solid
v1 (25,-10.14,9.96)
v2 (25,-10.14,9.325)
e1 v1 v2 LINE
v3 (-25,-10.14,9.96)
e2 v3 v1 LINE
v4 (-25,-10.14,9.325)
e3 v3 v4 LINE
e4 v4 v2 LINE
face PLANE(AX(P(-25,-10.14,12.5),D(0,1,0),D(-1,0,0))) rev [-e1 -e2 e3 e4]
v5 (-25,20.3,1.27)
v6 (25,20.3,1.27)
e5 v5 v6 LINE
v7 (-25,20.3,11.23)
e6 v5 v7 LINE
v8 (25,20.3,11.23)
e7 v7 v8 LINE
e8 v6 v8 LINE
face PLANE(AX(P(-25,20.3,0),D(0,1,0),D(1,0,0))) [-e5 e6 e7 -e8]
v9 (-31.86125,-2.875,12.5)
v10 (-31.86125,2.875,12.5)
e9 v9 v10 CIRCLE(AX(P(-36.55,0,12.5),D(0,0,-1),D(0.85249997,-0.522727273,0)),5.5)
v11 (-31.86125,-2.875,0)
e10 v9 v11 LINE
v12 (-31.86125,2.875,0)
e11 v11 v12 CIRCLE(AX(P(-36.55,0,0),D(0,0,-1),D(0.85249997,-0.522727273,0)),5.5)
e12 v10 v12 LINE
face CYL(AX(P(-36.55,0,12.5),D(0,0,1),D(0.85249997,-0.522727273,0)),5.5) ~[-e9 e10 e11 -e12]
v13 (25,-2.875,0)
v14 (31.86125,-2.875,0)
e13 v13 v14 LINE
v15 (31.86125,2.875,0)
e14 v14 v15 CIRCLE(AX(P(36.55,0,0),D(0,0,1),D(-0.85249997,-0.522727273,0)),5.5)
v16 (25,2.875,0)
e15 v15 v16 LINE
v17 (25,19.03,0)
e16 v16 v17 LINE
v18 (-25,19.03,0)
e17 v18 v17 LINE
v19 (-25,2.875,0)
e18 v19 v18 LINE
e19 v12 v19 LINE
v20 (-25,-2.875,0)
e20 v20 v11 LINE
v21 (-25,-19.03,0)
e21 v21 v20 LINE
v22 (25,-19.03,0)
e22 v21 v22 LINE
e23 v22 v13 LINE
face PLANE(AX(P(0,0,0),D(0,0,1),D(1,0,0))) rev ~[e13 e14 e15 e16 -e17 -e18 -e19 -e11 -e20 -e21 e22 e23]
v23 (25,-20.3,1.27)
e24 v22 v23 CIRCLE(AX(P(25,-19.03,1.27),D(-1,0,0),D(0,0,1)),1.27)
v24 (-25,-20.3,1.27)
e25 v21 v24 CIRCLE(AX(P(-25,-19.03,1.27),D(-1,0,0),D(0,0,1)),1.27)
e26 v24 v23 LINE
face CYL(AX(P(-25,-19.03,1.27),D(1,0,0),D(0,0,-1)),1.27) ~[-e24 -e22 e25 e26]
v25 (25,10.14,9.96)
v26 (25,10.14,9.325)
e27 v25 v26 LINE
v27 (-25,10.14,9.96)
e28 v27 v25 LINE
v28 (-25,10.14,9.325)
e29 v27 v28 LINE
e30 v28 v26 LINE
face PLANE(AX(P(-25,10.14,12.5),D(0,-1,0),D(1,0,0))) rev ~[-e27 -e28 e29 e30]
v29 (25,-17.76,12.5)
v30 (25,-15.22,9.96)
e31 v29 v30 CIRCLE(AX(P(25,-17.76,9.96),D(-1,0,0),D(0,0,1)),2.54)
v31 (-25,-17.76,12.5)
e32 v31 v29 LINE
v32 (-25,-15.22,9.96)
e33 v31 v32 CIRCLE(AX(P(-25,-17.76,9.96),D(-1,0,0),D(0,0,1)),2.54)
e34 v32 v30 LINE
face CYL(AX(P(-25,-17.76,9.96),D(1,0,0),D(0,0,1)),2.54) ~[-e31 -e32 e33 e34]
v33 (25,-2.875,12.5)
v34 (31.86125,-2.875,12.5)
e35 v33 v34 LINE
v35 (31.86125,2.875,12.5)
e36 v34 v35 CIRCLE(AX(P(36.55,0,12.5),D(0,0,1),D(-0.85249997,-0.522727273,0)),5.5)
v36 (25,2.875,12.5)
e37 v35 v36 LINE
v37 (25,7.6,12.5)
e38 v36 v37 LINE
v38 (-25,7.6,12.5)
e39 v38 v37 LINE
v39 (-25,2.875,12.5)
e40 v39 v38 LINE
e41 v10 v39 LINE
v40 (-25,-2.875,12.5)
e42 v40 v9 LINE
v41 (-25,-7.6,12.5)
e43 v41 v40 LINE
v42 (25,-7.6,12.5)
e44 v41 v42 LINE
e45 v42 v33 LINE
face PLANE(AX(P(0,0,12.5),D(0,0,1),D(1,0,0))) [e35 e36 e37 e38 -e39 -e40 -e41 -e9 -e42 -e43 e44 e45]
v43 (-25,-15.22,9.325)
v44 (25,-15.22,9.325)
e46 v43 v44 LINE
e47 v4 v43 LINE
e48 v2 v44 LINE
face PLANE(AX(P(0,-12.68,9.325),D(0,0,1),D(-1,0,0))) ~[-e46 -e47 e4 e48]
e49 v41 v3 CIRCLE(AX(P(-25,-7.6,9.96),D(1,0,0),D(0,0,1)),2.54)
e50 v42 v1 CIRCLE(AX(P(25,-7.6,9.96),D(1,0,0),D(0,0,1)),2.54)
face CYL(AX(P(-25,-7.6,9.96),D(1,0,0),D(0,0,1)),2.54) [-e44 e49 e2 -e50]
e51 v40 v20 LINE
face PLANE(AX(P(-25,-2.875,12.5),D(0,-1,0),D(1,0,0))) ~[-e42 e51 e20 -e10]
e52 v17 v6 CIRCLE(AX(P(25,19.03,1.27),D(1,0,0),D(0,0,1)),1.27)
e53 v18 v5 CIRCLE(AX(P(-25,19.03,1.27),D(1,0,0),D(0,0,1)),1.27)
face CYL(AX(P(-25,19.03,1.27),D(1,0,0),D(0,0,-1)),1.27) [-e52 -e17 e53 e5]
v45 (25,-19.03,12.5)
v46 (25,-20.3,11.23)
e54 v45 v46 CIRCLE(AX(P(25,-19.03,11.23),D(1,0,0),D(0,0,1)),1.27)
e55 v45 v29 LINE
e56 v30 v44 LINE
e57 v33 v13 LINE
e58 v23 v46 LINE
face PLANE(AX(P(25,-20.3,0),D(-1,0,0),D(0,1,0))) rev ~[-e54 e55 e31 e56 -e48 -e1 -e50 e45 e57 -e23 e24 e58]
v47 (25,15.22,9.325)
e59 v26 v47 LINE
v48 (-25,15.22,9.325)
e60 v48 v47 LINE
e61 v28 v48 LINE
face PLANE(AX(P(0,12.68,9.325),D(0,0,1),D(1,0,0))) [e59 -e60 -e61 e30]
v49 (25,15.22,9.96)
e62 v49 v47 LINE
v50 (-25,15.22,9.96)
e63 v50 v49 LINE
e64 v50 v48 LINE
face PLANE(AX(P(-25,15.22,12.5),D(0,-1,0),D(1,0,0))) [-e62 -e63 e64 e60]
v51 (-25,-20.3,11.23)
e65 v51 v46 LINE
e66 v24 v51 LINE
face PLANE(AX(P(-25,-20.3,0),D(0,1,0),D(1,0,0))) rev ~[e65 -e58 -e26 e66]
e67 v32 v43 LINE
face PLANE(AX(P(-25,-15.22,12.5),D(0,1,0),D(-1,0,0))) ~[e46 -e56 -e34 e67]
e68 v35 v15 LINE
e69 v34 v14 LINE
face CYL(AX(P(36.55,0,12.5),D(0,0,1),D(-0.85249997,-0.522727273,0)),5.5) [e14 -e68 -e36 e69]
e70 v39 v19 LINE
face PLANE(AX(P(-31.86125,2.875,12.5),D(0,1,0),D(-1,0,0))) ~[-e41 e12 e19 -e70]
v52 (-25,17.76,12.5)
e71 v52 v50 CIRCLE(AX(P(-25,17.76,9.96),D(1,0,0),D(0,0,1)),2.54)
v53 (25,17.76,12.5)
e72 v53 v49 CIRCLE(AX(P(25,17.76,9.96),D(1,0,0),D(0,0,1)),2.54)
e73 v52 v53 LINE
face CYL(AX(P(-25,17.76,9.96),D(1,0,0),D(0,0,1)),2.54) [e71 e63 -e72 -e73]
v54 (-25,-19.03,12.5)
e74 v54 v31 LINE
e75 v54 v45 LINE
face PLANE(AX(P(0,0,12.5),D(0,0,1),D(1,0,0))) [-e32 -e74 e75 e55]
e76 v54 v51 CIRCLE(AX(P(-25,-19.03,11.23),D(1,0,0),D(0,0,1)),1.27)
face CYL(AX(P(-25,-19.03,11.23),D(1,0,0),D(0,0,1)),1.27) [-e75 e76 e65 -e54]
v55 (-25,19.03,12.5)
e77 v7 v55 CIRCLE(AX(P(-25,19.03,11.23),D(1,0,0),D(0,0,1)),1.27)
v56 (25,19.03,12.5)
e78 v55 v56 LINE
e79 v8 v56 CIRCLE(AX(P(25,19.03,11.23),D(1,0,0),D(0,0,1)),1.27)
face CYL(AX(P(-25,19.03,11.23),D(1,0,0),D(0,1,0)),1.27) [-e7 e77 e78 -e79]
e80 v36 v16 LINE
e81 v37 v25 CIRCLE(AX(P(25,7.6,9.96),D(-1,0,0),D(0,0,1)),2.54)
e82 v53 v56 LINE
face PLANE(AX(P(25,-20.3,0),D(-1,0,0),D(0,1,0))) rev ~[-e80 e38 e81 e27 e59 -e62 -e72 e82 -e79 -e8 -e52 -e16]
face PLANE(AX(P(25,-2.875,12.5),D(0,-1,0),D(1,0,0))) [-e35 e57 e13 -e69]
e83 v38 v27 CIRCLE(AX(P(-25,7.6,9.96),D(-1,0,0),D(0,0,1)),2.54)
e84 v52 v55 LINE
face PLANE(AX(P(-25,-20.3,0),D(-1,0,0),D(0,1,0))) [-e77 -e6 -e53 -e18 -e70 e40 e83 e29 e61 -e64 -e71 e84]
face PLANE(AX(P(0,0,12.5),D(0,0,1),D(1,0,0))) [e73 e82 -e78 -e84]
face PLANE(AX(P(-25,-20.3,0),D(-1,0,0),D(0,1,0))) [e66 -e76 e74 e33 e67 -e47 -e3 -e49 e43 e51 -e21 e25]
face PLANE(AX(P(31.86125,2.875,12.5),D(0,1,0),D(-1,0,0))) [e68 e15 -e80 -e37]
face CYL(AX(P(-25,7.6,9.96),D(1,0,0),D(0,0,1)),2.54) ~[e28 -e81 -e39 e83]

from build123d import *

# Parameters (mm, degrees)
F0_W     = 50
F0_H     = 40.6
F1_DEPTH = 12.5
F3_DEPTH = 12.5
F4_W     = 50
F4_H     = 5.08
F5_DEPTH = 3.175
F6_R     = 1.27
F7_R     = 2.54


# Not quite as in the source:
# - a pattern or mirror of a feature is missing from the dataset's text; its kind, count and spacing are read off the source's solid
# - a feature names something its author has since deleted; it is built from what else it names


with BuildPart() as f1:
    # F0 (on Top) → F1 (new body)
    with BuildSketch(Plane.XY):
        Rectangle(F0_W, F0_H)
    extrude(amount=F1_DEPTH)

    # F2 (on face) → F3 (join, through all)
    with BuildSketch(Plane.XY.offset(12.5)):
        with BuildLine():
            Line((25, -2.875), (31.8612501666, -2.875))
            ThreePointArc((31.8612501666, -2.875), (42.05, 0), (31.8612501666, 2.875))
            Line((31.8612501666, 2.875), (25, 2.875))
            Line((25, 2.875), (25, 0))
            Line((25, 0), (25, -2.875))
        make_face()
    f3 = extrude(amount=-F3_DEPTH)

    # F3_copies: F3 across plane
    add(f3.mirror(Plane(origin=(0, 0, 0), x_dir=(0, 0, -1), z_dir=(-1, 0, 0))))

    # F4 (on face) → F5 (cut)
    with BuildSketch(Plane.XY.offset(12.5)):
        with Locations((0, 12.68)):
            Rectangle(F4_W, F4_H)
    f5 = extrude(amount=-F5_DEPTH, mode=Mode.SUBTRACT)

    # F5_copies: F5 across plane
    add(f5.mirror(Plane(origin=(0, 0, 0), x_dir=(0, 0, -1), z_dir=(0, -1, 0))), mode=Mode.SUBTRACT)

    # F6
    f6_edges = [f1.edges().sort_by_distance(p)[0] for p in [
        (0, 20.3, 12.5),
        (0, -20.3, 12.5),
        (0, 20.3, 0),
        (0, -20.3, 0),
    ]]
    fillet(f6_edges, radius=F6_R)

    # F7
    f7_edges = [f1.edges().sort_by_distance(p)[0] for p in [
        (0, 15.22, 12.5),
        (0, 10.14, 12.5),
        (0, -10.14, 12.5),
        (0, -15.22, 12.5),
    ]]
    fillet(f7_edges, radius=F7_R)


solid = f1.part
